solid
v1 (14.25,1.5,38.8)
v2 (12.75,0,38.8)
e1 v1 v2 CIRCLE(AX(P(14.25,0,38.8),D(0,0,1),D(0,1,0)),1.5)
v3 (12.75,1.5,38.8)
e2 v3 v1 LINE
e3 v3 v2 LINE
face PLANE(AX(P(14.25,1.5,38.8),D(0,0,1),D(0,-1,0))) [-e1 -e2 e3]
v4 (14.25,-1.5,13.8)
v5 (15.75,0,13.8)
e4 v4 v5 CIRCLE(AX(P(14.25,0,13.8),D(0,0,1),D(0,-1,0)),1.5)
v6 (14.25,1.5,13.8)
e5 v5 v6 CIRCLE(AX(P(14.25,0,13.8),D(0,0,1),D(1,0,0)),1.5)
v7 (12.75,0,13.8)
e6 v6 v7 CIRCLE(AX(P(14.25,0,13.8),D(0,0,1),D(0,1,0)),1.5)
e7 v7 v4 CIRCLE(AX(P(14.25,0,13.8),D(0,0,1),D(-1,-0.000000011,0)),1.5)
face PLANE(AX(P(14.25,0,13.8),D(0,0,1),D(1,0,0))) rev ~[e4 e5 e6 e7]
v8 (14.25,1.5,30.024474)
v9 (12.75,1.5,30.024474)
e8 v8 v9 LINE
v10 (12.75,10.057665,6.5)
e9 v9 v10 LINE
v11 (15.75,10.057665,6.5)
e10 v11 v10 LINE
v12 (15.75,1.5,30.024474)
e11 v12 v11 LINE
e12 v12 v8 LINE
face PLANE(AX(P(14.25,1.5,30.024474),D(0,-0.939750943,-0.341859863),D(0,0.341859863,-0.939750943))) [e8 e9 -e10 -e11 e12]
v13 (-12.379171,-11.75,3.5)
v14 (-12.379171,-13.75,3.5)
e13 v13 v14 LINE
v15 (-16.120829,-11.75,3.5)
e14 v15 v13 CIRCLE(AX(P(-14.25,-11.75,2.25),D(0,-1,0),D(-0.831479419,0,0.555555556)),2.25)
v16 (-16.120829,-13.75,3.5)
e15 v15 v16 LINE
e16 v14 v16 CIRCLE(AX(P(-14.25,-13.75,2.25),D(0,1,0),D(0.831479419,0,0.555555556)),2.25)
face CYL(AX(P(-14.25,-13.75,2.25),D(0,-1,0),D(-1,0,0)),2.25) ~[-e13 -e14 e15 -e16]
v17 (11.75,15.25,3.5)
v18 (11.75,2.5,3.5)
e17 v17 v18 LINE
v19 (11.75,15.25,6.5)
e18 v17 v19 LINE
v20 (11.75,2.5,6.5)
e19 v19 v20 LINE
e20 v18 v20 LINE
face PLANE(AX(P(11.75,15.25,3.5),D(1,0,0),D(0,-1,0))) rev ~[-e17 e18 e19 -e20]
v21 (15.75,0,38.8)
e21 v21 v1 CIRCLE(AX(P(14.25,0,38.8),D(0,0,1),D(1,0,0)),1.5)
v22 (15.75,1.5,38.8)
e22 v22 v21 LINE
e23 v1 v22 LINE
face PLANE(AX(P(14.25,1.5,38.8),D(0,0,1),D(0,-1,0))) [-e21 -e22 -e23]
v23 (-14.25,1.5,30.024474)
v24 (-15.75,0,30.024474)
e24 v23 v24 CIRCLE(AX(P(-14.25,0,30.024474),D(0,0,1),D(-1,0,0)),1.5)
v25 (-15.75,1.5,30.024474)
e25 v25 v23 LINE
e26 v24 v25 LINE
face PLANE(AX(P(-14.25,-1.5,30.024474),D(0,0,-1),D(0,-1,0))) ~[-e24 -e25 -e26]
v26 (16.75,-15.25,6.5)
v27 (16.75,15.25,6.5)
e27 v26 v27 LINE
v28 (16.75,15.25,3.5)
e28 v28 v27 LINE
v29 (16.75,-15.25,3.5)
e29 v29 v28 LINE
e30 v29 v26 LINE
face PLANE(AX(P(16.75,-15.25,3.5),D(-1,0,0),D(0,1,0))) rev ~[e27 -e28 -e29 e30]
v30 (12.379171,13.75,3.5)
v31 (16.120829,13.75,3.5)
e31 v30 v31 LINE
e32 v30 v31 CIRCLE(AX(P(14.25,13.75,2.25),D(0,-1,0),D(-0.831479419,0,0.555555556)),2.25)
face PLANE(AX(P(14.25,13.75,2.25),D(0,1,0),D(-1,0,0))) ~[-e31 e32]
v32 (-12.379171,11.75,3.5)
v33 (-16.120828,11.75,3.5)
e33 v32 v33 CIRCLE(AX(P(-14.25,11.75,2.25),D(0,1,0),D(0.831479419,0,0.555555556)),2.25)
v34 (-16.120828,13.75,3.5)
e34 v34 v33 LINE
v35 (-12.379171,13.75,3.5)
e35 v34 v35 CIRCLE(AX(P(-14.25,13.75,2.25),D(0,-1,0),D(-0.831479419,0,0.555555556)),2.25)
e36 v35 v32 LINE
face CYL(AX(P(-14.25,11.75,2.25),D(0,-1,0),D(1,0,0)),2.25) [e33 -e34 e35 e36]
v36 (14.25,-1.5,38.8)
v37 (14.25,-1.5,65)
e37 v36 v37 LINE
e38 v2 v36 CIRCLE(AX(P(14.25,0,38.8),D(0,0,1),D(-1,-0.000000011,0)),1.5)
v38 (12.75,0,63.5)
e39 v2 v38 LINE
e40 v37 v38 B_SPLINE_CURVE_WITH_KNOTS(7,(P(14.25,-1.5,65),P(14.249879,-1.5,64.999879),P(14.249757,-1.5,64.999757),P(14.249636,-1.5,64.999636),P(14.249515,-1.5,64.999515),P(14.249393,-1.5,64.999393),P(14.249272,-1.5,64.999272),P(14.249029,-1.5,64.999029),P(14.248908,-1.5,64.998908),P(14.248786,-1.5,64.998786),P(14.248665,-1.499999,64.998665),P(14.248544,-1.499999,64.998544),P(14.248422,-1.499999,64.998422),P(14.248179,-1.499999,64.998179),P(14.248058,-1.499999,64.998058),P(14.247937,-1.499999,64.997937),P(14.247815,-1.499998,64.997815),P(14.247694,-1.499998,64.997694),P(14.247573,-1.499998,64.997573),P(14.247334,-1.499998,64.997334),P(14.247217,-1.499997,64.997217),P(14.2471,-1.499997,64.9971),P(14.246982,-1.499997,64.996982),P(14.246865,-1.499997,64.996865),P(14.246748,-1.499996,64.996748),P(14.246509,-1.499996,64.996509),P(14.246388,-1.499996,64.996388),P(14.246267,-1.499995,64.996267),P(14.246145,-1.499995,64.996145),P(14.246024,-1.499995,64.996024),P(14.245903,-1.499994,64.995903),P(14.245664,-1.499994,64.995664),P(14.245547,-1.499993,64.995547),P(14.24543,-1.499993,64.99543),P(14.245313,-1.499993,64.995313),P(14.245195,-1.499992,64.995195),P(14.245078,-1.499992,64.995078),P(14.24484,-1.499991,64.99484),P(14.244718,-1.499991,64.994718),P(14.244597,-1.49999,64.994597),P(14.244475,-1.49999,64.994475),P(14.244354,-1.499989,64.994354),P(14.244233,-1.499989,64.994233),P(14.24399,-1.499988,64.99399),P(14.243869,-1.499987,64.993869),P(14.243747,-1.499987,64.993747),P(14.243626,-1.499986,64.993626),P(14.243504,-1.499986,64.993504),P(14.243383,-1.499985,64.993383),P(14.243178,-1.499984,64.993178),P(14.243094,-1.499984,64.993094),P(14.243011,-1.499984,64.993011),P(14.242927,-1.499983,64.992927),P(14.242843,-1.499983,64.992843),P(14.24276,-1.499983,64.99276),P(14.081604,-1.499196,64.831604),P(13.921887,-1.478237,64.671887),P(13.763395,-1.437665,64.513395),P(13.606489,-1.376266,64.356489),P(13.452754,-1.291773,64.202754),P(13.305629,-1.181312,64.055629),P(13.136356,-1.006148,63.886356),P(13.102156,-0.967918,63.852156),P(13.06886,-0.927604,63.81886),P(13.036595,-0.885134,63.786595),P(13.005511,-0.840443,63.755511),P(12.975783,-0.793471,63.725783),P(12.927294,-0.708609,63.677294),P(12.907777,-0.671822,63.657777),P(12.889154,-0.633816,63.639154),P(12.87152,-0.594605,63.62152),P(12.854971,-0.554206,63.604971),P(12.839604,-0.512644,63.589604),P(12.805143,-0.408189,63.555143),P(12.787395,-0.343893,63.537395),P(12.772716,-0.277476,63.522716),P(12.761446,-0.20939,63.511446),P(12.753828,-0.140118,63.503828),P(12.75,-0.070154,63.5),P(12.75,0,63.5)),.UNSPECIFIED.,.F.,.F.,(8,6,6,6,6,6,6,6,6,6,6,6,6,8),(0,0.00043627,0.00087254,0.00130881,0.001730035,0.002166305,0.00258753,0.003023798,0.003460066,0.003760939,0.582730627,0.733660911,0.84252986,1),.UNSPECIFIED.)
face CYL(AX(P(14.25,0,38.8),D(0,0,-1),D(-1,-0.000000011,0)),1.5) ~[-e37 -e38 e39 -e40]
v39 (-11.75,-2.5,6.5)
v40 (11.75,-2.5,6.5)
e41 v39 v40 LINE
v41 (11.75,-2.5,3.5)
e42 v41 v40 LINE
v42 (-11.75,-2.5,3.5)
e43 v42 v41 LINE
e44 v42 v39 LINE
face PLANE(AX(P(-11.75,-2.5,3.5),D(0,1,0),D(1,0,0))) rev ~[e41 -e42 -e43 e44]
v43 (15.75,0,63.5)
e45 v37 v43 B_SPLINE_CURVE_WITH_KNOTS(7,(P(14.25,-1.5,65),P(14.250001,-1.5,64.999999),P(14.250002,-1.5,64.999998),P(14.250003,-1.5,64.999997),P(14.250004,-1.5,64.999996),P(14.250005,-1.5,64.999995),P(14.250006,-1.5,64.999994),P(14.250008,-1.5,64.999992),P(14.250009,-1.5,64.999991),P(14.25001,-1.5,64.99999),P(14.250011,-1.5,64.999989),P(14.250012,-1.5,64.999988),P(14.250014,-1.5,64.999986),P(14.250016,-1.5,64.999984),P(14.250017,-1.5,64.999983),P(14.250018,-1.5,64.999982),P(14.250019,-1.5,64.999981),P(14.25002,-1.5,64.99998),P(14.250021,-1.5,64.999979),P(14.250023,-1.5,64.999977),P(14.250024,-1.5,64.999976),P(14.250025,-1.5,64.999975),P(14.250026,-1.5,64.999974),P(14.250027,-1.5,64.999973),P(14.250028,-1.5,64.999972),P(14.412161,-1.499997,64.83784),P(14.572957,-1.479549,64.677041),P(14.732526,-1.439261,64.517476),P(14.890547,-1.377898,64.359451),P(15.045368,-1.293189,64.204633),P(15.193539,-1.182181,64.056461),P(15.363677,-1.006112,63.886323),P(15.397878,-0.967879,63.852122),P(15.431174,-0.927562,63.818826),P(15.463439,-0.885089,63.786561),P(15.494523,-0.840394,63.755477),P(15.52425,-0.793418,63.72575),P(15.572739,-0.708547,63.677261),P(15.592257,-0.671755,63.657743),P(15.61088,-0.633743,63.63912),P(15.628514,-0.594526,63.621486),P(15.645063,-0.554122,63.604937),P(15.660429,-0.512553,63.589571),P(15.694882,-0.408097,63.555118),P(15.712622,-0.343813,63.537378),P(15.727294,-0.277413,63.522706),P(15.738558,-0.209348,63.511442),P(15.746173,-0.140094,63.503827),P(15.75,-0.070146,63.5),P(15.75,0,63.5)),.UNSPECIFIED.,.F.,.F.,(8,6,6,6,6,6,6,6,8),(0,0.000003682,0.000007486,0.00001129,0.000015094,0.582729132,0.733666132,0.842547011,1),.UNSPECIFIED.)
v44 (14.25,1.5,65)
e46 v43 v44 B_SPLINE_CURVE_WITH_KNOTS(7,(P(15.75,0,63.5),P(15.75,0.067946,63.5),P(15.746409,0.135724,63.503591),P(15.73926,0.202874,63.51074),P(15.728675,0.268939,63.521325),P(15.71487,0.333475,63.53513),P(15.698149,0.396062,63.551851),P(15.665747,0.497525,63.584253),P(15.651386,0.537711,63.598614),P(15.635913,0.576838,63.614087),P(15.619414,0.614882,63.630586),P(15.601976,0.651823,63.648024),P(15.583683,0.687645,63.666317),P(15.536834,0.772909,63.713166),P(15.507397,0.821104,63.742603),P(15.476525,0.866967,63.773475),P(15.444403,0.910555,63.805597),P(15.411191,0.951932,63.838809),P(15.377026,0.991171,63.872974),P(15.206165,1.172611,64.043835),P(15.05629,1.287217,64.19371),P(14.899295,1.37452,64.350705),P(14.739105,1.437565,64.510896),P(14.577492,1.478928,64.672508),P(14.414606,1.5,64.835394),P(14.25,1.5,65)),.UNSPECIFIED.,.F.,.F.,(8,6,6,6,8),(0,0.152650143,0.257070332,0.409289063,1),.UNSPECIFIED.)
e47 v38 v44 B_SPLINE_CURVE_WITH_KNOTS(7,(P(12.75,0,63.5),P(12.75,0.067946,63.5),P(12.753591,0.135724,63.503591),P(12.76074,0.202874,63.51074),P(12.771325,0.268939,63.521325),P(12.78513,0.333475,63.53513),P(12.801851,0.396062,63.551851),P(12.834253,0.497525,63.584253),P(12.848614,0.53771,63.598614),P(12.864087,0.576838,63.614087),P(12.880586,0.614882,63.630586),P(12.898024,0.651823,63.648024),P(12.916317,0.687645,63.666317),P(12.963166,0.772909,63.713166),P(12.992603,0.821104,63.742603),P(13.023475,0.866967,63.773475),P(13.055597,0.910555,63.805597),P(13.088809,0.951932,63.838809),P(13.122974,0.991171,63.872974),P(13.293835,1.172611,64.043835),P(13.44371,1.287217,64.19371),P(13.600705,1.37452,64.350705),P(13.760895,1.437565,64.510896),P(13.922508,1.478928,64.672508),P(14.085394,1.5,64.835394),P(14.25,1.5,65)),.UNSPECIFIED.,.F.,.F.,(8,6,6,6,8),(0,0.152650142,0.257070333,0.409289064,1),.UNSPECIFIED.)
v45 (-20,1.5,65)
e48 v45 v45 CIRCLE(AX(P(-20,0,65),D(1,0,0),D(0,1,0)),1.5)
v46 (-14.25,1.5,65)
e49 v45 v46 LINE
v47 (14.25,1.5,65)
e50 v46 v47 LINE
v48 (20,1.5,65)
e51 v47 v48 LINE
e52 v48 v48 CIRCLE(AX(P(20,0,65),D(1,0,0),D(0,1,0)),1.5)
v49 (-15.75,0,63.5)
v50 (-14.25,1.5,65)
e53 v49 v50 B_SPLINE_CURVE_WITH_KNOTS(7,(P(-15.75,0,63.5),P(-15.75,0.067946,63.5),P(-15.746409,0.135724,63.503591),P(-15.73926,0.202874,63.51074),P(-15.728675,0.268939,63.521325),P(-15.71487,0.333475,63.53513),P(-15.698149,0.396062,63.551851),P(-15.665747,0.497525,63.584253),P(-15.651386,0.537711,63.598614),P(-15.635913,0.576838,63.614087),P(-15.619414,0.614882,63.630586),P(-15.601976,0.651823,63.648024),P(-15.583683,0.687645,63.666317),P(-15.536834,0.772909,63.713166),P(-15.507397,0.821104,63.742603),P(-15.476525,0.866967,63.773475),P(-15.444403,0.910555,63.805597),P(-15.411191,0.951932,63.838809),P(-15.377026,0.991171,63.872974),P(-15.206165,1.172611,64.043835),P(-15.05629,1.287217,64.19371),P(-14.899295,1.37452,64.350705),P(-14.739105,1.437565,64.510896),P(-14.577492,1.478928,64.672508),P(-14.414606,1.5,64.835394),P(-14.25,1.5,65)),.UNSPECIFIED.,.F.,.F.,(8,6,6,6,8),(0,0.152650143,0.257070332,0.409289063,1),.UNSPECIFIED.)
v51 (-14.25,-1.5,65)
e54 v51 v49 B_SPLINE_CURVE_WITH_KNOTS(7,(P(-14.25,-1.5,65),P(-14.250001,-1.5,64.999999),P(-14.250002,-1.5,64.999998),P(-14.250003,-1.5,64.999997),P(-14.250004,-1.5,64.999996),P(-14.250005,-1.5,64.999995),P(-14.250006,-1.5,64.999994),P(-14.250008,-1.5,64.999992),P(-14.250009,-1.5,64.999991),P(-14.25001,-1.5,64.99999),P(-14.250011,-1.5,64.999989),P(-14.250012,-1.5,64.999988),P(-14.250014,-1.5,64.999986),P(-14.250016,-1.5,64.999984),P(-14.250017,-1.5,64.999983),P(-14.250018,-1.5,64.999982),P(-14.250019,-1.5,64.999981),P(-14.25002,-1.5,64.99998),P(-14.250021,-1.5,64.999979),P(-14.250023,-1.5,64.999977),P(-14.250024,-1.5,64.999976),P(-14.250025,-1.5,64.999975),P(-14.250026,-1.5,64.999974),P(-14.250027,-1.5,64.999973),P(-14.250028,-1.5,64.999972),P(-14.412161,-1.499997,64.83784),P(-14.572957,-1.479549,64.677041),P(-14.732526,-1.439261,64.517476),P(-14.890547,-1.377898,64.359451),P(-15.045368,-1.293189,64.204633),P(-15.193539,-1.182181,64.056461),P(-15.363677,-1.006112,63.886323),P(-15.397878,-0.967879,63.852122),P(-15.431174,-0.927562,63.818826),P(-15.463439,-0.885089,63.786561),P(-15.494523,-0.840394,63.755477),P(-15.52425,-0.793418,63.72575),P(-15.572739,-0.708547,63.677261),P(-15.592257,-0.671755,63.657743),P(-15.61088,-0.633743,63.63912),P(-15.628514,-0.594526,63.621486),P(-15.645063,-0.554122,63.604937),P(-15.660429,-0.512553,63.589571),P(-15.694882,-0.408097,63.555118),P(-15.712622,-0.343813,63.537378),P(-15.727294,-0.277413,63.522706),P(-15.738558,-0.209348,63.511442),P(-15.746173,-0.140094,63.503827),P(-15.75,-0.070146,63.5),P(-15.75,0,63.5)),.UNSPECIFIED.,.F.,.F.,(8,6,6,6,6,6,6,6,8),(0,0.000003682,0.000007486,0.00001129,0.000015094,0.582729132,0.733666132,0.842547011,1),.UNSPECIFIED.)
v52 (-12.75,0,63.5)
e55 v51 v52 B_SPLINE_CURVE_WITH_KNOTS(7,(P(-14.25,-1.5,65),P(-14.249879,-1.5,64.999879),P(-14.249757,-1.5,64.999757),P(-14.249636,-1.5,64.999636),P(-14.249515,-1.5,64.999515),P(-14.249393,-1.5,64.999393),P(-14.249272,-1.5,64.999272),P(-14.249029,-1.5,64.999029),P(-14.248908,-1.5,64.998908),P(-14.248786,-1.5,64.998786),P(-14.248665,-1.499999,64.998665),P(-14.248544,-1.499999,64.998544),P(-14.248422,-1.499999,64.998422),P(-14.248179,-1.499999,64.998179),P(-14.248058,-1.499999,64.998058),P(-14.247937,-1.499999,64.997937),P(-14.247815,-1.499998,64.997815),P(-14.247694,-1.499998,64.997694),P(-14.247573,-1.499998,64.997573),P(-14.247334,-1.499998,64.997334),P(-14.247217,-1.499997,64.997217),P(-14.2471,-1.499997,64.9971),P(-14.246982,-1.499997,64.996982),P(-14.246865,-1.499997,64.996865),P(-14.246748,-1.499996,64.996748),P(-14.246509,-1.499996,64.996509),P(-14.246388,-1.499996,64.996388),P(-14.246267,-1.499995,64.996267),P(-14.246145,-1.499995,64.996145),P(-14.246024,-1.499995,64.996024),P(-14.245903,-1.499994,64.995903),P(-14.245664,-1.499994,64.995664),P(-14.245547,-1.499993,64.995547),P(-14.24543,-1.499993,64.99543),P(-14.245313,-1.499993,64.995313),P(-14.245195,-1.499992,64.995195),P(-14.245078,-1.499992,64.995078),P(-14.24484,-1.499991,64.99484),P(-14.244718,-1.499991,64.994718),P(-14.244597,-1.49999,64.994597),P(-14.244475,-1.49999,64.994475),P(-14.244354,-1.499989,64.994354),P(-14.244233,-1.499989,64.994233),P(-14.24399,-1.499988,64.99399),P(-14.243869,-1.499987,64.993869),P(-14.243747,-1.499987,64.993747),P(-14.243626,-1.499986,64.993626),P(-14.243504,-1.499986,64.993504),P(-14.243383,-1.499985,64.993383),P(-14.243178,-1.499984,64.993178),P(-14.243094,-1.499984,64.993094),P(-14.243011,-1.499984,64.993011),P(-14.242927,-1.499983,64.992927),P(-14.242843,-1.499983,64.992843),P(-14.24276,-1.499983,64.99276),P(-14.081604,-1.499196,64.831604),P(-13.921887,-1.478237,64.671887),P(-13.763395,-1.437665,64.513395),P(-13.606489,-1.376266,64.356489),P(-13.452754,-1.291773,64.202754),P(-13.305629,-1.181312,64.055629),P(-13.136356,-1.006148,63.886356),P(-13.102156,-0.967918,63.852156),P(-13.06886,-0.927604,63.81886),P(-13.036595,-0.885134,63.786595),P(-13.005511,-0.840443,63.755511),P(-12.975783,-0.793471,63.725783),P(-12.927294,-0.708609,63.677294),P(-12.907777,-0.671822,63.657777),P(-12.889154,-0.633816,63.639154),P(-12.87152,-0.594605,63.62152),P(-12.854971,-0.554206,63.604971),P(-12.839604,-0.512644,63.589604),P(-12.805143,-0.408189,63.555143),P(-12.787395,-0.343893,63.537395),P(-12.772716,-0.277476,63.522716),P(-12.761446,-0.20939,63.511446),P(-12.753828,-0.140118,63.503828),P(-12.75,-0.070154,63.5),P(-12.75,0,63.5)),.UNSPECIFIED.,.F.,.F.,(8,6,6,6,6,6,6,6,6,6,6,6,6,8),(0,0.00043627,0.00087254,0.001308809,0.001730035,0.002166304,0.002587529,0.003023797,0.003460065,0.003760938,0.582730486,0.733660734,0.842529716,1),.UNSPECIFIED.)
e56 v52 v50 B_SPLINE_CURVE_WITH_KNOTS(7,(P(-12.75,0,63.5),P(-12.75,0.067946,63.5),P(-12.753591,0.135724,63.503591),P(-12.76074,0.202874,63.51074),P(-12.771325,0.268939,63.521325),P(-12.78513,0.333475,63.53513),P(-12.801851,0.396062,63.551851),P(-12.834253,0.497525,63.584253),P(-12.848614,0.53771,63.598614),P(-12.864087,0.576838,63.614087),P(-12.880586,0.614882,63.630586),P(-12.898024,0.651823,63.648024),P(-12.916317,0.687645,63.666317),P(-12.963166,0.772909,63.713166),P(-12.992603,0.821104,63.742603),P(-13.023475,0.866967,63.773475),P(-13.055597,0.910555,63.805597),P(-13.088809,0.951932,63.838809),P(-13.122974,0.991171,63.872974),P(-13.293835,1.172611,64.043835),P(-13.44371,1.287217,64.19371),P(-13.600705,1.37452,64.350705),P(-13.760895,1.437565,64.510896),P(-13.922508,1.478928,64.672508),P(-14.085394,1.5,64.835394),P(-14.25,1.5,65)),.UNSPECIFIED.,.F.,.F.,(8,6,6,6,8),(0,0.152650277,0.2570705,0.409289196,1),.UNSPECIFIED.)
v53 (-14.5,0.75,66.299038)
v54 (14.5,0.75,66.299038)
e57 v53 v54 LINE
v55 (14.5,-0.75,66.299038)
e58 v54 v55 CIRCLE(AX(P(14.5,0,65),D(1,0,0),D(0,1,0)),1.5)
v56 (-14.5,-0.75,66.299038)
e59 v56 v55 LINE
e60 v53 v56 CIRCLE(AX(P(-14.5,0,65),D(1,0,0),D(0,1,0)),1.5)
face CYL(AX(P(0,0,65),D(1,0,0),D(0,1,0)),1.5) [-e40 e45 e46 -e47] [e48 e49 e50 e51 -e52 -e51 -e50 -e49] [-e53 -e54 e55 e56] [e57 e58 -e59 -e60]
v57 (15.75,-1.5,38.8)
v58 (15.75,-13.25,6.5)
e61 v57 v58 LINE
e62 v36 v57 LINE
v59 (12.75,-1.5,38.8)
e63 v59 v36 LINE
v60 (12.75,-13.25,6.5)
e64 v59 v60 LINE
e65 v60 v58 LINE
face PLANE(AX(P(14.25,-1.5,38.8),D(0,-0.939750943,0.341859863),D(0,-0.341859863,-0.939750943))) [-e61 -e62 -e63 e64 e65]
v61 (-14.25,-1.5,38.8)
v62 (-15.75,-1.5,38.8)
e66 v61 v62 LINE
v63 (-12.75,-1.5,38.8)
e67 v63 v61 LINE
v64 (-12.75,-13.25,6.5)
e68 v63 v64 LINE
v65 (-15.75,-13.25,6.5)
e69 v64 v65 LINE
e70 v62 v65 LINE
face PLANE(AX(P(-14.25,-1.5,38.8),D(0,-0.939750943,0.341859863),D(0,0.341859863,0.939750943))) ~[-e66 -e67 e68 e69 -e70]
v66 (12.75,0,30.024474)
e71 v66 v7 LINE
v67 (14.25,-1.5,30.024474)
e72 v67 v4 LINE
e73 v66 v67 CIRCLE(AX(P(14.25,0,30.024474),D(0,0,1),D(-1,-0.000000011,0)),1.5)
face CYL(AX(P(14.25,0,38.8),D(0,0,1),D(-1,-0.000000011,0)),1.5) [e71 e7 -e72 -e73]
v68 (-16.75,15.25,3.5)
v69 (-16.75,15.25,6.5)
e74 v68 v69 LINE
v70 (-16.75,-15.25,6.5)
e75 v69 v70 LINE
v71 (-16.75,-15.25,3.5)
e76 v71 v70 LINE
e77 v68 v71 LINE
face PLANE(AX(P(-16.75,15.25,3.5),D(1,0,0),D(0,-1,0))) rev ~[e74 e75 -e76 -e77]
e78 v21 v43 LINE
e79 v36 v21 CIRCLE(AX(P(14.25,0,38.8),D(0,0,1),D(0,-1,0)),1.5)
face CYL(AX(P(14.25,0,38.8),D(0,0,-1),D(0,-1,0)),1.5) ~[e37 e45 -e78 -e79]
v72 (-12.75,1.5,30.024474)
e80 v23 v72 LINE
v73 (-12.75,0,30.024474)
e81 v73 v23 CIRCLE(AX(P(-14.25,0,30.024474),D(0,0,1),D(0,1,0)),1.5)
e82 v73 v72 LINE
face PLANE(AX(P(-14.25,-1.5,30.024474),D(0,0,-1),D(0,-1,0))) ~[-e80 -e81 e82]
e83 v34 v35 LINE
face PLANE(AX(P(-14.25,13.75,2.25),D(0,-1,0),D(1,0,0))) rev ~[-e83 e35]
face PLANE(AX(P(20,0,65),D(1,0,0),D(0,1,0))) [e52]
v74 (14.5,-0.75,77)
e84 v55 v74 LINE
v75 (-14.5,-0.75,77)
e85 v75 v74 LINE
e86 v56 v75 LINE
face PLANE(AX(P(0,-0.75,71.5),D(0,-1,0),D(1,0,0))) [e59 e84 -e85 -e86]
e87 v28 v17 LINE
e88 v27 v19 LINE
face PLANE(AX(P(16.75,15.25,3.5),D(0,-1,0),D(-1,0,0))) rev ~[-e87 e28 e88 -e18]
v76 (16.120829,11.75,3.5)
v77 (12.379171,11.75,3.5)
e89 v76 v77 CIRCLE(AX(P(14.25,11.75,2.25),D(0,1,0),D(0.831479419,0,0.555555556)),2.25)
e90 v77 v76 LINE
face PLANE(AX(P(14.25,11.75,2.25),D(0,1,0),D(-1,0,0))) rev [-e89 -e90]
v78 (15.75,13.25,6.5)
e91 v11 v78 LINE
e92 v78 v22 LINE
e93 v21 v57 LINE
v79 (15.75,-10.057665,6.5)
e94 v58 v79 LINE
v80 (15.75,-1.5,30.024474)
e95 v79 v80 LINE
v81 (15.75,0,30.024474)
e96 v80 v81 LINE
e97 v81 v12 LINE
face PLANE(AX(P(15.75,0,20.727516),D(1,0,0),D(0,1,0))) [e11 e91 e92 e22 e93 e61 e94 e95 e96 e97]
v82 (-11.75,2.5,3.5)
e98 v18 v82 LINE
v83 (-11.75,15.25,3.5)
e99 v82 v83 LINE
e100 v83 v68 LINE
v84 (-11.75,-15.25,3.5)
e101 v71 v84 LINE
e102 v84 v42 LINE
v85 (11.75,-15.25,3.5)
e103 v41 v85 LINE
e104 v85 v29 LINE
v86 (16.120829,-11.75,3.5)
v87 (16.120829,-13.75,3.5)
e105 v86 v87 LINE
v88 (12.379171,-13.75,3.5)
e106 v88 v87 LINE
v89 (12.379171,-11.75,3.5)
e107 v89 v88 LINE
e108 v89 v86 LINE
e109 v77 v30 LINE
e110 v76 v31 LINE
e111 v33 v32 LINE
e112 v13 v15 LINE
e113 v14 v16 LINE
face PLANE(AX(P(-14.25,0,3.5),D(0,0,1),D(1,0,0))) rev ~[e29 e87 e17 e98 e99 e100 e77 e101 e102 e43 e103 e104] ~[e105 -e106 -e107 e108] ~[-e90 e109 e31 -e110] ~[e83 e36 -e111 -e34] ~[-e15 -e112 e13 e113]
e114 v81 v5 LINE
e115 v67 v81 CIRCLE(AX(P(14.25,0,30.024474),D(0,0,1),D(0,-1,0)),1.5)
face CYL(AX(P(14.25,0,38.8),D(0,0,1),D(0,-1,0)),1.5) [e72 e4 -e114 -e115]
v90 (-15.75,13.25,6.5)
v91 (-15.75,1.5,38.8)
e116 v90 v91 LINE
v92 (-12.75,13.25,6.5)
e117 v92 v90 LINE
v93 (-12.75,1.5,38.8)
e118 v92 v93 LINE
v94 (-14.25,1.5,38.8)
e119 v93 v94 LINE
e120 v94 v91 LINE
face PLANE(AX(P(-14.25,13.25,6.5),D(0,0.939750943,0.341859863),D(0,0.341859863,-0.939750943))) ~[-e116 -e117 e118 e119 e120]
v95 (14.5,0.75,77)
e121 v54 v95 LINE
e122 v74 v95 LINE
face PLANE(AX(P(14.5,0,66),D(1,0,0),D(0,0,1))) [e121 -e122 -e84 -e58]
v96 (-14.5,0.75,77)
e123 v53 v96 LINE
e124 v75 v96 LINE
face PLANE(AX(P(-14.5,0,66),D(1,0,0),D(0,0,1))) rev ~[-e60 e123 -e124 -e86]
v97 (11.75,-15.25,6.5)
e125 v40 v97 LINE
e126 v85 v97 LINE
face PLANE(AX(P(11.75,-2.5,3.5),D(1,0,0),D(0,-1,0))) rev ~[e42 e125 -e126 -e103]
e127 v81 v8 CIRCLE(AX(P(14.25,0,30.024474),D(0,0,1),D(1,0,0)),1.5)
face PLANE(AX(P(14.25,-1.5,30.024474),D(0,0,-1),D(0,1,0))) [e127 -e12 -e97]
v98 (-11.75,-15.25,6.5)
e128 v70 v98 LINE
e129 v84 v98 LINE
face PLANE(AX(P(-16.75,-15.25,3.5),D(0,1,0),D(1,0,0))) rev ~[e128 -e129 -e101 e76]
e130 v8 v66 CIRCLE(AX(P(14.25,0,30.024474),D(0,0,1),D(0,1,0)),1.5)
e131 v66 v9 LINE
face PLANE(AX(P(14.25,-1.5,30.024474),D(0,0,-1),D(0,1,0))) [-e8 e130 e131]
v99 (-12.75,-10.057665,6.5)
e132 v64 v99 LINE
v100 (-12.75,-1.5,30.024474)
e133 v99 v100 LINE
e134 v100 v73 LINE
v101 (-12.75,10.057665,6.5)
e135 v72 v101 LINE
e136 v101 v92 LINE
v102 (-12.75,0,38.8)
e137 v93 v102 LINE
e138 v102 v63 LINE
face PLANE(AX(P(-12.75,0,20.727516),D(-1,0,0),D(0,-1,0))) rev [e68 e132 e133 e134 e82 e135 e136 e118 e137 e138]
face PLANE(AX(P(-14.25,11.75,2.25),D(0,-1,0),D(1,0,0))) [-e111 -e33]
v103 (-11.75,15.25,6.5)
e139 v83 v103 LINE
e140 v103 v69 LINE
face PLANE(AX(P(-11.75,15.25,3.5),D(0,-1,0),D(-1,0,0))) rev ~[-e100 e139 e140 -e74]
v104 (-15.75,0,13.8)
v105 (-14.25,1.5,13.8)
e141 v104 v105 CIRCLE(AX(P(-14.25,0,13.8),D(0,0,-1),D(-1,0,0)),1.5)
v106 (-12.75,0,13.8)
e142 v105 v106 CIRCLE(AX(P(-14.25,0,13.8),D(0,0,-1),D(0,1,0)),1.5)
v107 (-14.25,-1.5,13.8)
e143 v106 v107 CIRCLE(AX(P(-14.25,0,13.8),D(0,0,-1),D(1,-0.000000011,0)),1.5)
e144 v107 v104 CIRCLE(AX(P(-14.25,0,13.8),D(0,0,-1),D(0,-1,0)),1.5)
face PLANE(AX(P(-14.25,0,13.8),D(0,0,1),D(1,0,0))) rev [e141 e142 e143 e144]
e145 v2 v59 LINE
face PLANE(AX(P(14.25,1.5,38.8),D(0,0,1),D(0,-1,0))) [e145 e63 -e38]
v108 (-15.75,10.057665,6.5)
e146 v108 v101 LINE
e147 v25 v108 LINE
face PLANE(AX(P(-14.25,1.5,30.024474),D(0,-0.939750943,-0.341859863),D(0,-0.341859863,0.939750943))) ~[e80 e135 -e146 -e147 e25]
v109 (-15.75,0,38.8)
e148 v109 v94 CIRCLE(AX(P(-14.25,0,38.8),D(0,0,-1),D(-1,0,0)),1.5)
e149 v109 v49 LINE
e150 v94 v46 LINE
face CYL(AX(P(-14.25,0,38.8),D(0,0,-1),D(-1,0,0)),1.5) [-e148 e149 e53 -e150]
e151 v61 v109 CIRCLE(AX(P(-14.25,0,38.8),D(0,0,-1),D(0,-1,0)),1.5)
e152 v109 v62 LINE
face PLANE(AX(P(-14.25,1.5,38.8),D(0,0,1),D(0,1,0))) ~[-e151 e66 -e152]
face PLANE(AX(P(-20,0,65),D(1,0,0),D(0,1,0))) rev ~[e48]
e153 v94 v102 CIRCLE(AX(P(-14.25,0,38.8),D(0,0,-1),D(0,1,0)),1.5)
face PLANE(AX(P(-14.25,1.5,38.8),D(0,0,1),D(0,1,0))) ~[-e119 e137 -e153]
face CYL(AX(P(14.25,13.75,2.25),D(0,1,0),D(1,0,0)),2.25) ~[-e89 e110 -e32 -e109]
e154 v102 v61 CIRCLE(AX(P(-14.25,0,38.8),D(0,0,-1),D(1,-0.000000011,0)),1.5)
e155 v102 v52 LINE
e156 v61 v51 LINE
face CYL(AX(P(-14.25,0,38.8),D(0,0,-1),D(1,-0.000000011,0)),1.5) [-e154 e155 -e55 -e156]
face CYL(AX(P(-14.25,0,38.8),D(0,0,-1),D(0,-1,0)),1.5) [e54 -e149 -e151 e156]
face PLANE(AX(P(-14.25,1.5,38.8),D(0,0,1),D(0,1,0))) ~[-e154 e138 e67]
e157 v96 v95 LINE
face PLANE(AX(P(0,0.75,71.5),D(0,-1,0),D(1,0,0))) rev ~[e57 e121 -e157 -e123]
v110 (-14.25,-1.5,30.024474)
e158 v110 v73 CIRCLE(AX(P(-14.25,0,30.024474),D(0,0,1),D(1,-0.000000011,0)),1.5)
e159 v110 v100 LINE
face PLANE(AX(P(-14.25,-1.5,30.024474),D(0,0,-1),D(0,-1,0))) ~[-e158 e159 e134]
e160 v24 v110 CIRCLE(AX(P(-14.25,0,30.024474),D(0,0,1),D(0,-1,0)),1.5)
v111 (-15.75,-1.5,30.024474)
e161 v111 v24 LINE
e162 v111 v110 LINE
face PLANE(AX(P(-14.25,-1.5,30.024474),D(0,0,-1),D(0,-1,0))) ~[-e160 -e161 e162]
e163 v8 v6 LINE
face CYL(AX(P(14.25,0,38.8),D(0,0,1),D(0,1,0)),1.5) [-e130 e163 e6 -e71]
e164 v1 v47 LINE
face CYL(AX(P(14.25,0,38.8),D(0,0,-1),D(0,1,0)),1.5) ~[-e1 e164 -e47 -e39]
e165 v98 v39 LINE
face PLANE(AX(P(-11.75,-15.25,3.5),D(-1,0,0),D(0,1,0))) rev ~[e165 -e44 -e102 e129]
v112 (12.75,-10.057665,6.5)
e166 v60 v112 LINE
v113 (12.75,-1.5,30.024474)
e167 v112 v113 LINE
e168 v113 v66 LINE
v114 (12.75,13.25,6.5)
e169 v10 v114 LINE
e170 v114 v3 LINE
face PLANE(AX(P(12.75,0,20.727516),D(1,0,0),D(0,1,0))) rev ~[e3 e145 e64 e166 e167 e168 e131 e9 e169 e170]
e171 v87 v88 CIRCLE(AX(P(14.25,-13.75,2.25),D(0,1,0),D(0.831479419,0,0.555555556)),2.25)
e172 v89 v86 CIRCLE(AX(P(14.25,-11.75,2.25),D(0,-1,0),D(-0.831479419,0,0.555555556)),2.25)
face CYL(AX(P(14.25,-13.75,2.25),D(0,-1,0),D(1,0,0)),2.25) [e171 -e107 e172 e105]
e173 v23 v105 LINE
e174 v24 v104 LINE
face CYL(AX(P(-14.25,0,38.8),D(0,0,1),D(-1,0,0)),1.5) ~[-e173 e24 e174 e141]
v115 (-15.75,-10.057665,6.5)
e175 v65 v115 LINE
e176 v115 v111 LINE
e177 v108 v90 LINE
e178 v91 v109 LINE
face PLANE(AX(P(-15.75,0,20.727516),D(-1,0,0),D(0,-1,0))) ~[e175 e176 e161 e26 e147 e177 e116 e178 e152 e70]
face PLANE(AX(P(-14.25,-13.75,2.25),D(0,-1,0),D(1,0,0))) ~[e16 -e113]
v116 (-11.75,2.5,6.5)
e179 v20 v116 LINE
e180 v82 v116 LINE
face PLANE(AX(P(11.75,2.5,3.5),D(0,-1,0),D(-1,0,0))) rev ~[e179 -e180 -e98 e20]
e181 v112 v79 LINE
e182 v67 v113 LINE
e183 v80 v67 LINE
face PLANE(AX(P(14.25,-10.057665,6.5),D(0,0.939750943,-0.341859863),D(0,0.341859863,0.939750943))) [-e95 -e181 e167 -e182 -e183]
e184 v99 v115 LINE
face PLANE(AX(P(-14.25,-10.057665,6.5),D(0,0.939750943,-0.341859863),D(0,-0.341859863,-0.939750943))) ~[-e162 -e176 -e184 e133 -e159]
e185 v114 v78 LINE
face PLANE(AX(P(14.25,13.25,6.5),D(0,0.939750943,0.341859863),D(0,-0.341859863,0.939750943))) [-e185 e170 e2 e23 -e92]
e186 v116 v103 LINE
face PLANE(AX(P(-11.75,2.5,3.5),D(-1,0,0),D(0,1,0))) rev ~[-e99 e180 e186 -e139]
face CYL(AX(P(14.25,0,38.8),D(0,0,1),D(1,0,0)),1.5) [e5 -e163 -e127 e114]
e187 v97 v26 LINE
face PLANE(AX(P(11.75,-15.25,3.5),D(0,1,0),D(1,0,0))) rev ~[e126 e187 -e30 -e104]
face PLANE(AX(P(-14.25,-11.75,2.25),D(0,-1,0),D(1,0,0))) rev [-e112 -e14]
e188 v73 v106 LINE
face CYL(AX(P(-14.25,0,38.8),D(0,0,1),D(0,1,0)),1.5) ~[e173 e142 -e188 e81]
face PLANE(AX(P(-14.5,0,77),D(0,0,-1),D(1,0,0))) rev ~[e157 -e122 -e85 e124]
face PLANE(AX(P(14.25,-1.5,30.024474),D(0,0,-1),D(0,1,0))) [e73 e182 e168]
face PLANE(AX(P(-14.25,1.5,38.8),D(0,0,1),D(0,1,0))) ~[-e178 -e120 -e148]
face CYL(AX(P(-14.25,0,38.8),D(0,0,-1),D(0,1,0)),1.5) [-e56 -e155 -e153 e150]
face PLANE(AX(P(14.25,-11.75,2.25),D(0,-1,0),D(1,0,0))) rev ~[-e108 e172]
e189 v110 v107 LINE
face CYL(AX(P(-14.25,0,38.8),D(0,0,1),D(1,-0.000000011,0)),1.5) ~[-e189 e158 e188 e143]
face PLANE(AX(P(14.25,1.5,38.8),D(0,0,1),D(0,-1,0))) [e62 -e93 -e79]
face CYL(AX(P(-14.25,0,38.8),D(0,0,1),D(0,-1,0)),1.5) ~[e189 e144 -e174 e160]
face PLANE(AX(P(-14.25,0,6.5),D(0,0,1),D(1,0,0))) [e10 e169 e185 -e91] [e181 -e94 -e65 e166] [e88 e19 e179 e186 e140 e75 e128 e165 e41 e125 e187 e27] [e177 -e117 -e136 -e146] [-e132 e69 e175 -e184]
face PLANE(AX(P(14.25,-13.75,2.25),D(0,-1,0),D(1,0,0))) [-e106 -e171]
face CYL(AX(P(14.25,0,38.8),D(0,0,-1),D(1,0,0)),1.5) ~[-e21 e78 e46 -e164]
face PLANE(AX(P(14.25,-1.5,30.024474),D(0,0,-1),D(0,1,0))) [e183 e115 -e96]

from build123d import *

# Parameters (mm, degrees)
F2_DEPTH          = 3
F6_DEPTH          = 1.5
F9_DEPTH          = 26.2
F9_DEPTH_BACK     = 25
F10_R             = 1.5
F11_DEPTH         = 20
F13_R             = 2.25
F14_DEPTH         = 2
F14_COPIES2_COUNT = 2
F14_COPIES2_PITCH = 38.242646
F15_W             = 29
F15_H             = 11
F16_DEPTH         = 0.75


# Not quite as in the source:
# - a pattern or mirror of a feature is missing from the dataset's text; its kind, count and spacing are read off the source's solid


with BuildPart() as f2:
    # F1 (on offset) → F2 (new body)
    with BuildSketch(Plane.XY.offset(3.5)):
        Polygon((-11.75, -15.25), (-11.75, -2.5), (-11.75, 2.5), (-11.75, 15.25), (-16.75, 15.25), (-16.75, 0), (-16.75, -15.25), align=None)
        Polygon((0, -2.5), (11.75, -2.5), (11.75, 2.5), (0, 2.5), (-11.75, 2.5), (-11.75, -2.5), align=None)
        Polygon((16.75, -15.25), (16.75, 0), (16.75, 15.25), (11.75, 15.25), (11.75, 2.5), (11.75, -2.5), (11.75, -15.25), align=None)
    extrude(amount=F2_DEPTH)

    # F5 (on plane+point) → F6 (join, symmetric)
    with BuildSketch(Plane.YZ.offset(14.25)):
        Polygon((10.057664814, 6.5), (13.25, 6.5), (1.5, 38.8), (0, 38.8), (-1.5, 38.8), (-13.25, 6.5), (-10.057664814, 6.5), (-1.5, 30.0244743399), (0, 30.0244743399), (1.5, 30.0244743399), align=None)
    f6 = extrude(amount=F6_DEPTH, both=True)

    # F6_copies: F6 across plane
    add(f6.mirror(Plane(origin=(0, 0, 0), x_dir=(0, 0, -1), z_dir=(-1, 0, 0))))

    # F8 (on face) → F9 (join, two sides)
    with BuildSketch(Plane.XY.offset(38.8)) as f9_sk:
        with BuildLine():
            ThreePointArc((14.25, -1.5), (15.3106601718, -1.0606601718), (15.75, 0))
            ThreePointArc((15.75, 0), (15.3106601718, 1.0606601718), (14.25, 1.5))
            ThreePointArc((14.25, 1.5), (13.1893398223, 1.0606601659), (12.75, -1.67e-08))
            ThreePointArc((12.75, -1.67e-08), (13.1893398341, -1.0606601777), (14.25, -1.5))
        make_face()
    f9 = extrude(amount=F9_DEPTH) + extrude(f9_sk.sketch, amount=-F9_DEPTH_BACK)

    # F9_copies: F9 across plane
    add(f9.mirror(Plane(origin=(0, 0, 0), x_dir=(0, 0, -1), z_dir=(-1, 0, 0))))

    # F10 (on Right) → F11 (join, symmetric)
    with BuildSketch(Plane.YZ):
        with Locations((0, 65)):
            Circle(F10_R)
    extrude(amount=F11_DEPTH, both=True)

    # F13 (on offset) → F14 (join)
    with BuildSketch(Plane.XZ.offset(13.75)):
        with Locations((14.25, 2.25)):
            Circle(F13_R)
    f14 = extrude(amount=-F14_DEPTH)

    # F14_copies: F14 across plane
    add(f14.mirror(Plane.ZX))

    # F14_copies1: F14 across plane
    add(f14.mirror(Plane(origin=(0, 0, 0), x_dir=(0, 0, -1), z_dir=(-1, 0, 0))))

    # F14_copies2: F14 ×2
    with Locations(*[Vector(-0.7452413135, 0.6667948595, 0) * (i * F14_COPIES2_PITCH) for i in range(1, F14_COPIES2_COUNT)]):
        add(f14)

    # F15 (on Front) → F16 (join, symmetric)
    with BuildSketch(Plane.XZ):
        with Locations((0, 71.5)):
            Rectangle(F15_W, F15_H)
    extrude(amount=F16_DEPTH, both=True)


solid = f2.part
